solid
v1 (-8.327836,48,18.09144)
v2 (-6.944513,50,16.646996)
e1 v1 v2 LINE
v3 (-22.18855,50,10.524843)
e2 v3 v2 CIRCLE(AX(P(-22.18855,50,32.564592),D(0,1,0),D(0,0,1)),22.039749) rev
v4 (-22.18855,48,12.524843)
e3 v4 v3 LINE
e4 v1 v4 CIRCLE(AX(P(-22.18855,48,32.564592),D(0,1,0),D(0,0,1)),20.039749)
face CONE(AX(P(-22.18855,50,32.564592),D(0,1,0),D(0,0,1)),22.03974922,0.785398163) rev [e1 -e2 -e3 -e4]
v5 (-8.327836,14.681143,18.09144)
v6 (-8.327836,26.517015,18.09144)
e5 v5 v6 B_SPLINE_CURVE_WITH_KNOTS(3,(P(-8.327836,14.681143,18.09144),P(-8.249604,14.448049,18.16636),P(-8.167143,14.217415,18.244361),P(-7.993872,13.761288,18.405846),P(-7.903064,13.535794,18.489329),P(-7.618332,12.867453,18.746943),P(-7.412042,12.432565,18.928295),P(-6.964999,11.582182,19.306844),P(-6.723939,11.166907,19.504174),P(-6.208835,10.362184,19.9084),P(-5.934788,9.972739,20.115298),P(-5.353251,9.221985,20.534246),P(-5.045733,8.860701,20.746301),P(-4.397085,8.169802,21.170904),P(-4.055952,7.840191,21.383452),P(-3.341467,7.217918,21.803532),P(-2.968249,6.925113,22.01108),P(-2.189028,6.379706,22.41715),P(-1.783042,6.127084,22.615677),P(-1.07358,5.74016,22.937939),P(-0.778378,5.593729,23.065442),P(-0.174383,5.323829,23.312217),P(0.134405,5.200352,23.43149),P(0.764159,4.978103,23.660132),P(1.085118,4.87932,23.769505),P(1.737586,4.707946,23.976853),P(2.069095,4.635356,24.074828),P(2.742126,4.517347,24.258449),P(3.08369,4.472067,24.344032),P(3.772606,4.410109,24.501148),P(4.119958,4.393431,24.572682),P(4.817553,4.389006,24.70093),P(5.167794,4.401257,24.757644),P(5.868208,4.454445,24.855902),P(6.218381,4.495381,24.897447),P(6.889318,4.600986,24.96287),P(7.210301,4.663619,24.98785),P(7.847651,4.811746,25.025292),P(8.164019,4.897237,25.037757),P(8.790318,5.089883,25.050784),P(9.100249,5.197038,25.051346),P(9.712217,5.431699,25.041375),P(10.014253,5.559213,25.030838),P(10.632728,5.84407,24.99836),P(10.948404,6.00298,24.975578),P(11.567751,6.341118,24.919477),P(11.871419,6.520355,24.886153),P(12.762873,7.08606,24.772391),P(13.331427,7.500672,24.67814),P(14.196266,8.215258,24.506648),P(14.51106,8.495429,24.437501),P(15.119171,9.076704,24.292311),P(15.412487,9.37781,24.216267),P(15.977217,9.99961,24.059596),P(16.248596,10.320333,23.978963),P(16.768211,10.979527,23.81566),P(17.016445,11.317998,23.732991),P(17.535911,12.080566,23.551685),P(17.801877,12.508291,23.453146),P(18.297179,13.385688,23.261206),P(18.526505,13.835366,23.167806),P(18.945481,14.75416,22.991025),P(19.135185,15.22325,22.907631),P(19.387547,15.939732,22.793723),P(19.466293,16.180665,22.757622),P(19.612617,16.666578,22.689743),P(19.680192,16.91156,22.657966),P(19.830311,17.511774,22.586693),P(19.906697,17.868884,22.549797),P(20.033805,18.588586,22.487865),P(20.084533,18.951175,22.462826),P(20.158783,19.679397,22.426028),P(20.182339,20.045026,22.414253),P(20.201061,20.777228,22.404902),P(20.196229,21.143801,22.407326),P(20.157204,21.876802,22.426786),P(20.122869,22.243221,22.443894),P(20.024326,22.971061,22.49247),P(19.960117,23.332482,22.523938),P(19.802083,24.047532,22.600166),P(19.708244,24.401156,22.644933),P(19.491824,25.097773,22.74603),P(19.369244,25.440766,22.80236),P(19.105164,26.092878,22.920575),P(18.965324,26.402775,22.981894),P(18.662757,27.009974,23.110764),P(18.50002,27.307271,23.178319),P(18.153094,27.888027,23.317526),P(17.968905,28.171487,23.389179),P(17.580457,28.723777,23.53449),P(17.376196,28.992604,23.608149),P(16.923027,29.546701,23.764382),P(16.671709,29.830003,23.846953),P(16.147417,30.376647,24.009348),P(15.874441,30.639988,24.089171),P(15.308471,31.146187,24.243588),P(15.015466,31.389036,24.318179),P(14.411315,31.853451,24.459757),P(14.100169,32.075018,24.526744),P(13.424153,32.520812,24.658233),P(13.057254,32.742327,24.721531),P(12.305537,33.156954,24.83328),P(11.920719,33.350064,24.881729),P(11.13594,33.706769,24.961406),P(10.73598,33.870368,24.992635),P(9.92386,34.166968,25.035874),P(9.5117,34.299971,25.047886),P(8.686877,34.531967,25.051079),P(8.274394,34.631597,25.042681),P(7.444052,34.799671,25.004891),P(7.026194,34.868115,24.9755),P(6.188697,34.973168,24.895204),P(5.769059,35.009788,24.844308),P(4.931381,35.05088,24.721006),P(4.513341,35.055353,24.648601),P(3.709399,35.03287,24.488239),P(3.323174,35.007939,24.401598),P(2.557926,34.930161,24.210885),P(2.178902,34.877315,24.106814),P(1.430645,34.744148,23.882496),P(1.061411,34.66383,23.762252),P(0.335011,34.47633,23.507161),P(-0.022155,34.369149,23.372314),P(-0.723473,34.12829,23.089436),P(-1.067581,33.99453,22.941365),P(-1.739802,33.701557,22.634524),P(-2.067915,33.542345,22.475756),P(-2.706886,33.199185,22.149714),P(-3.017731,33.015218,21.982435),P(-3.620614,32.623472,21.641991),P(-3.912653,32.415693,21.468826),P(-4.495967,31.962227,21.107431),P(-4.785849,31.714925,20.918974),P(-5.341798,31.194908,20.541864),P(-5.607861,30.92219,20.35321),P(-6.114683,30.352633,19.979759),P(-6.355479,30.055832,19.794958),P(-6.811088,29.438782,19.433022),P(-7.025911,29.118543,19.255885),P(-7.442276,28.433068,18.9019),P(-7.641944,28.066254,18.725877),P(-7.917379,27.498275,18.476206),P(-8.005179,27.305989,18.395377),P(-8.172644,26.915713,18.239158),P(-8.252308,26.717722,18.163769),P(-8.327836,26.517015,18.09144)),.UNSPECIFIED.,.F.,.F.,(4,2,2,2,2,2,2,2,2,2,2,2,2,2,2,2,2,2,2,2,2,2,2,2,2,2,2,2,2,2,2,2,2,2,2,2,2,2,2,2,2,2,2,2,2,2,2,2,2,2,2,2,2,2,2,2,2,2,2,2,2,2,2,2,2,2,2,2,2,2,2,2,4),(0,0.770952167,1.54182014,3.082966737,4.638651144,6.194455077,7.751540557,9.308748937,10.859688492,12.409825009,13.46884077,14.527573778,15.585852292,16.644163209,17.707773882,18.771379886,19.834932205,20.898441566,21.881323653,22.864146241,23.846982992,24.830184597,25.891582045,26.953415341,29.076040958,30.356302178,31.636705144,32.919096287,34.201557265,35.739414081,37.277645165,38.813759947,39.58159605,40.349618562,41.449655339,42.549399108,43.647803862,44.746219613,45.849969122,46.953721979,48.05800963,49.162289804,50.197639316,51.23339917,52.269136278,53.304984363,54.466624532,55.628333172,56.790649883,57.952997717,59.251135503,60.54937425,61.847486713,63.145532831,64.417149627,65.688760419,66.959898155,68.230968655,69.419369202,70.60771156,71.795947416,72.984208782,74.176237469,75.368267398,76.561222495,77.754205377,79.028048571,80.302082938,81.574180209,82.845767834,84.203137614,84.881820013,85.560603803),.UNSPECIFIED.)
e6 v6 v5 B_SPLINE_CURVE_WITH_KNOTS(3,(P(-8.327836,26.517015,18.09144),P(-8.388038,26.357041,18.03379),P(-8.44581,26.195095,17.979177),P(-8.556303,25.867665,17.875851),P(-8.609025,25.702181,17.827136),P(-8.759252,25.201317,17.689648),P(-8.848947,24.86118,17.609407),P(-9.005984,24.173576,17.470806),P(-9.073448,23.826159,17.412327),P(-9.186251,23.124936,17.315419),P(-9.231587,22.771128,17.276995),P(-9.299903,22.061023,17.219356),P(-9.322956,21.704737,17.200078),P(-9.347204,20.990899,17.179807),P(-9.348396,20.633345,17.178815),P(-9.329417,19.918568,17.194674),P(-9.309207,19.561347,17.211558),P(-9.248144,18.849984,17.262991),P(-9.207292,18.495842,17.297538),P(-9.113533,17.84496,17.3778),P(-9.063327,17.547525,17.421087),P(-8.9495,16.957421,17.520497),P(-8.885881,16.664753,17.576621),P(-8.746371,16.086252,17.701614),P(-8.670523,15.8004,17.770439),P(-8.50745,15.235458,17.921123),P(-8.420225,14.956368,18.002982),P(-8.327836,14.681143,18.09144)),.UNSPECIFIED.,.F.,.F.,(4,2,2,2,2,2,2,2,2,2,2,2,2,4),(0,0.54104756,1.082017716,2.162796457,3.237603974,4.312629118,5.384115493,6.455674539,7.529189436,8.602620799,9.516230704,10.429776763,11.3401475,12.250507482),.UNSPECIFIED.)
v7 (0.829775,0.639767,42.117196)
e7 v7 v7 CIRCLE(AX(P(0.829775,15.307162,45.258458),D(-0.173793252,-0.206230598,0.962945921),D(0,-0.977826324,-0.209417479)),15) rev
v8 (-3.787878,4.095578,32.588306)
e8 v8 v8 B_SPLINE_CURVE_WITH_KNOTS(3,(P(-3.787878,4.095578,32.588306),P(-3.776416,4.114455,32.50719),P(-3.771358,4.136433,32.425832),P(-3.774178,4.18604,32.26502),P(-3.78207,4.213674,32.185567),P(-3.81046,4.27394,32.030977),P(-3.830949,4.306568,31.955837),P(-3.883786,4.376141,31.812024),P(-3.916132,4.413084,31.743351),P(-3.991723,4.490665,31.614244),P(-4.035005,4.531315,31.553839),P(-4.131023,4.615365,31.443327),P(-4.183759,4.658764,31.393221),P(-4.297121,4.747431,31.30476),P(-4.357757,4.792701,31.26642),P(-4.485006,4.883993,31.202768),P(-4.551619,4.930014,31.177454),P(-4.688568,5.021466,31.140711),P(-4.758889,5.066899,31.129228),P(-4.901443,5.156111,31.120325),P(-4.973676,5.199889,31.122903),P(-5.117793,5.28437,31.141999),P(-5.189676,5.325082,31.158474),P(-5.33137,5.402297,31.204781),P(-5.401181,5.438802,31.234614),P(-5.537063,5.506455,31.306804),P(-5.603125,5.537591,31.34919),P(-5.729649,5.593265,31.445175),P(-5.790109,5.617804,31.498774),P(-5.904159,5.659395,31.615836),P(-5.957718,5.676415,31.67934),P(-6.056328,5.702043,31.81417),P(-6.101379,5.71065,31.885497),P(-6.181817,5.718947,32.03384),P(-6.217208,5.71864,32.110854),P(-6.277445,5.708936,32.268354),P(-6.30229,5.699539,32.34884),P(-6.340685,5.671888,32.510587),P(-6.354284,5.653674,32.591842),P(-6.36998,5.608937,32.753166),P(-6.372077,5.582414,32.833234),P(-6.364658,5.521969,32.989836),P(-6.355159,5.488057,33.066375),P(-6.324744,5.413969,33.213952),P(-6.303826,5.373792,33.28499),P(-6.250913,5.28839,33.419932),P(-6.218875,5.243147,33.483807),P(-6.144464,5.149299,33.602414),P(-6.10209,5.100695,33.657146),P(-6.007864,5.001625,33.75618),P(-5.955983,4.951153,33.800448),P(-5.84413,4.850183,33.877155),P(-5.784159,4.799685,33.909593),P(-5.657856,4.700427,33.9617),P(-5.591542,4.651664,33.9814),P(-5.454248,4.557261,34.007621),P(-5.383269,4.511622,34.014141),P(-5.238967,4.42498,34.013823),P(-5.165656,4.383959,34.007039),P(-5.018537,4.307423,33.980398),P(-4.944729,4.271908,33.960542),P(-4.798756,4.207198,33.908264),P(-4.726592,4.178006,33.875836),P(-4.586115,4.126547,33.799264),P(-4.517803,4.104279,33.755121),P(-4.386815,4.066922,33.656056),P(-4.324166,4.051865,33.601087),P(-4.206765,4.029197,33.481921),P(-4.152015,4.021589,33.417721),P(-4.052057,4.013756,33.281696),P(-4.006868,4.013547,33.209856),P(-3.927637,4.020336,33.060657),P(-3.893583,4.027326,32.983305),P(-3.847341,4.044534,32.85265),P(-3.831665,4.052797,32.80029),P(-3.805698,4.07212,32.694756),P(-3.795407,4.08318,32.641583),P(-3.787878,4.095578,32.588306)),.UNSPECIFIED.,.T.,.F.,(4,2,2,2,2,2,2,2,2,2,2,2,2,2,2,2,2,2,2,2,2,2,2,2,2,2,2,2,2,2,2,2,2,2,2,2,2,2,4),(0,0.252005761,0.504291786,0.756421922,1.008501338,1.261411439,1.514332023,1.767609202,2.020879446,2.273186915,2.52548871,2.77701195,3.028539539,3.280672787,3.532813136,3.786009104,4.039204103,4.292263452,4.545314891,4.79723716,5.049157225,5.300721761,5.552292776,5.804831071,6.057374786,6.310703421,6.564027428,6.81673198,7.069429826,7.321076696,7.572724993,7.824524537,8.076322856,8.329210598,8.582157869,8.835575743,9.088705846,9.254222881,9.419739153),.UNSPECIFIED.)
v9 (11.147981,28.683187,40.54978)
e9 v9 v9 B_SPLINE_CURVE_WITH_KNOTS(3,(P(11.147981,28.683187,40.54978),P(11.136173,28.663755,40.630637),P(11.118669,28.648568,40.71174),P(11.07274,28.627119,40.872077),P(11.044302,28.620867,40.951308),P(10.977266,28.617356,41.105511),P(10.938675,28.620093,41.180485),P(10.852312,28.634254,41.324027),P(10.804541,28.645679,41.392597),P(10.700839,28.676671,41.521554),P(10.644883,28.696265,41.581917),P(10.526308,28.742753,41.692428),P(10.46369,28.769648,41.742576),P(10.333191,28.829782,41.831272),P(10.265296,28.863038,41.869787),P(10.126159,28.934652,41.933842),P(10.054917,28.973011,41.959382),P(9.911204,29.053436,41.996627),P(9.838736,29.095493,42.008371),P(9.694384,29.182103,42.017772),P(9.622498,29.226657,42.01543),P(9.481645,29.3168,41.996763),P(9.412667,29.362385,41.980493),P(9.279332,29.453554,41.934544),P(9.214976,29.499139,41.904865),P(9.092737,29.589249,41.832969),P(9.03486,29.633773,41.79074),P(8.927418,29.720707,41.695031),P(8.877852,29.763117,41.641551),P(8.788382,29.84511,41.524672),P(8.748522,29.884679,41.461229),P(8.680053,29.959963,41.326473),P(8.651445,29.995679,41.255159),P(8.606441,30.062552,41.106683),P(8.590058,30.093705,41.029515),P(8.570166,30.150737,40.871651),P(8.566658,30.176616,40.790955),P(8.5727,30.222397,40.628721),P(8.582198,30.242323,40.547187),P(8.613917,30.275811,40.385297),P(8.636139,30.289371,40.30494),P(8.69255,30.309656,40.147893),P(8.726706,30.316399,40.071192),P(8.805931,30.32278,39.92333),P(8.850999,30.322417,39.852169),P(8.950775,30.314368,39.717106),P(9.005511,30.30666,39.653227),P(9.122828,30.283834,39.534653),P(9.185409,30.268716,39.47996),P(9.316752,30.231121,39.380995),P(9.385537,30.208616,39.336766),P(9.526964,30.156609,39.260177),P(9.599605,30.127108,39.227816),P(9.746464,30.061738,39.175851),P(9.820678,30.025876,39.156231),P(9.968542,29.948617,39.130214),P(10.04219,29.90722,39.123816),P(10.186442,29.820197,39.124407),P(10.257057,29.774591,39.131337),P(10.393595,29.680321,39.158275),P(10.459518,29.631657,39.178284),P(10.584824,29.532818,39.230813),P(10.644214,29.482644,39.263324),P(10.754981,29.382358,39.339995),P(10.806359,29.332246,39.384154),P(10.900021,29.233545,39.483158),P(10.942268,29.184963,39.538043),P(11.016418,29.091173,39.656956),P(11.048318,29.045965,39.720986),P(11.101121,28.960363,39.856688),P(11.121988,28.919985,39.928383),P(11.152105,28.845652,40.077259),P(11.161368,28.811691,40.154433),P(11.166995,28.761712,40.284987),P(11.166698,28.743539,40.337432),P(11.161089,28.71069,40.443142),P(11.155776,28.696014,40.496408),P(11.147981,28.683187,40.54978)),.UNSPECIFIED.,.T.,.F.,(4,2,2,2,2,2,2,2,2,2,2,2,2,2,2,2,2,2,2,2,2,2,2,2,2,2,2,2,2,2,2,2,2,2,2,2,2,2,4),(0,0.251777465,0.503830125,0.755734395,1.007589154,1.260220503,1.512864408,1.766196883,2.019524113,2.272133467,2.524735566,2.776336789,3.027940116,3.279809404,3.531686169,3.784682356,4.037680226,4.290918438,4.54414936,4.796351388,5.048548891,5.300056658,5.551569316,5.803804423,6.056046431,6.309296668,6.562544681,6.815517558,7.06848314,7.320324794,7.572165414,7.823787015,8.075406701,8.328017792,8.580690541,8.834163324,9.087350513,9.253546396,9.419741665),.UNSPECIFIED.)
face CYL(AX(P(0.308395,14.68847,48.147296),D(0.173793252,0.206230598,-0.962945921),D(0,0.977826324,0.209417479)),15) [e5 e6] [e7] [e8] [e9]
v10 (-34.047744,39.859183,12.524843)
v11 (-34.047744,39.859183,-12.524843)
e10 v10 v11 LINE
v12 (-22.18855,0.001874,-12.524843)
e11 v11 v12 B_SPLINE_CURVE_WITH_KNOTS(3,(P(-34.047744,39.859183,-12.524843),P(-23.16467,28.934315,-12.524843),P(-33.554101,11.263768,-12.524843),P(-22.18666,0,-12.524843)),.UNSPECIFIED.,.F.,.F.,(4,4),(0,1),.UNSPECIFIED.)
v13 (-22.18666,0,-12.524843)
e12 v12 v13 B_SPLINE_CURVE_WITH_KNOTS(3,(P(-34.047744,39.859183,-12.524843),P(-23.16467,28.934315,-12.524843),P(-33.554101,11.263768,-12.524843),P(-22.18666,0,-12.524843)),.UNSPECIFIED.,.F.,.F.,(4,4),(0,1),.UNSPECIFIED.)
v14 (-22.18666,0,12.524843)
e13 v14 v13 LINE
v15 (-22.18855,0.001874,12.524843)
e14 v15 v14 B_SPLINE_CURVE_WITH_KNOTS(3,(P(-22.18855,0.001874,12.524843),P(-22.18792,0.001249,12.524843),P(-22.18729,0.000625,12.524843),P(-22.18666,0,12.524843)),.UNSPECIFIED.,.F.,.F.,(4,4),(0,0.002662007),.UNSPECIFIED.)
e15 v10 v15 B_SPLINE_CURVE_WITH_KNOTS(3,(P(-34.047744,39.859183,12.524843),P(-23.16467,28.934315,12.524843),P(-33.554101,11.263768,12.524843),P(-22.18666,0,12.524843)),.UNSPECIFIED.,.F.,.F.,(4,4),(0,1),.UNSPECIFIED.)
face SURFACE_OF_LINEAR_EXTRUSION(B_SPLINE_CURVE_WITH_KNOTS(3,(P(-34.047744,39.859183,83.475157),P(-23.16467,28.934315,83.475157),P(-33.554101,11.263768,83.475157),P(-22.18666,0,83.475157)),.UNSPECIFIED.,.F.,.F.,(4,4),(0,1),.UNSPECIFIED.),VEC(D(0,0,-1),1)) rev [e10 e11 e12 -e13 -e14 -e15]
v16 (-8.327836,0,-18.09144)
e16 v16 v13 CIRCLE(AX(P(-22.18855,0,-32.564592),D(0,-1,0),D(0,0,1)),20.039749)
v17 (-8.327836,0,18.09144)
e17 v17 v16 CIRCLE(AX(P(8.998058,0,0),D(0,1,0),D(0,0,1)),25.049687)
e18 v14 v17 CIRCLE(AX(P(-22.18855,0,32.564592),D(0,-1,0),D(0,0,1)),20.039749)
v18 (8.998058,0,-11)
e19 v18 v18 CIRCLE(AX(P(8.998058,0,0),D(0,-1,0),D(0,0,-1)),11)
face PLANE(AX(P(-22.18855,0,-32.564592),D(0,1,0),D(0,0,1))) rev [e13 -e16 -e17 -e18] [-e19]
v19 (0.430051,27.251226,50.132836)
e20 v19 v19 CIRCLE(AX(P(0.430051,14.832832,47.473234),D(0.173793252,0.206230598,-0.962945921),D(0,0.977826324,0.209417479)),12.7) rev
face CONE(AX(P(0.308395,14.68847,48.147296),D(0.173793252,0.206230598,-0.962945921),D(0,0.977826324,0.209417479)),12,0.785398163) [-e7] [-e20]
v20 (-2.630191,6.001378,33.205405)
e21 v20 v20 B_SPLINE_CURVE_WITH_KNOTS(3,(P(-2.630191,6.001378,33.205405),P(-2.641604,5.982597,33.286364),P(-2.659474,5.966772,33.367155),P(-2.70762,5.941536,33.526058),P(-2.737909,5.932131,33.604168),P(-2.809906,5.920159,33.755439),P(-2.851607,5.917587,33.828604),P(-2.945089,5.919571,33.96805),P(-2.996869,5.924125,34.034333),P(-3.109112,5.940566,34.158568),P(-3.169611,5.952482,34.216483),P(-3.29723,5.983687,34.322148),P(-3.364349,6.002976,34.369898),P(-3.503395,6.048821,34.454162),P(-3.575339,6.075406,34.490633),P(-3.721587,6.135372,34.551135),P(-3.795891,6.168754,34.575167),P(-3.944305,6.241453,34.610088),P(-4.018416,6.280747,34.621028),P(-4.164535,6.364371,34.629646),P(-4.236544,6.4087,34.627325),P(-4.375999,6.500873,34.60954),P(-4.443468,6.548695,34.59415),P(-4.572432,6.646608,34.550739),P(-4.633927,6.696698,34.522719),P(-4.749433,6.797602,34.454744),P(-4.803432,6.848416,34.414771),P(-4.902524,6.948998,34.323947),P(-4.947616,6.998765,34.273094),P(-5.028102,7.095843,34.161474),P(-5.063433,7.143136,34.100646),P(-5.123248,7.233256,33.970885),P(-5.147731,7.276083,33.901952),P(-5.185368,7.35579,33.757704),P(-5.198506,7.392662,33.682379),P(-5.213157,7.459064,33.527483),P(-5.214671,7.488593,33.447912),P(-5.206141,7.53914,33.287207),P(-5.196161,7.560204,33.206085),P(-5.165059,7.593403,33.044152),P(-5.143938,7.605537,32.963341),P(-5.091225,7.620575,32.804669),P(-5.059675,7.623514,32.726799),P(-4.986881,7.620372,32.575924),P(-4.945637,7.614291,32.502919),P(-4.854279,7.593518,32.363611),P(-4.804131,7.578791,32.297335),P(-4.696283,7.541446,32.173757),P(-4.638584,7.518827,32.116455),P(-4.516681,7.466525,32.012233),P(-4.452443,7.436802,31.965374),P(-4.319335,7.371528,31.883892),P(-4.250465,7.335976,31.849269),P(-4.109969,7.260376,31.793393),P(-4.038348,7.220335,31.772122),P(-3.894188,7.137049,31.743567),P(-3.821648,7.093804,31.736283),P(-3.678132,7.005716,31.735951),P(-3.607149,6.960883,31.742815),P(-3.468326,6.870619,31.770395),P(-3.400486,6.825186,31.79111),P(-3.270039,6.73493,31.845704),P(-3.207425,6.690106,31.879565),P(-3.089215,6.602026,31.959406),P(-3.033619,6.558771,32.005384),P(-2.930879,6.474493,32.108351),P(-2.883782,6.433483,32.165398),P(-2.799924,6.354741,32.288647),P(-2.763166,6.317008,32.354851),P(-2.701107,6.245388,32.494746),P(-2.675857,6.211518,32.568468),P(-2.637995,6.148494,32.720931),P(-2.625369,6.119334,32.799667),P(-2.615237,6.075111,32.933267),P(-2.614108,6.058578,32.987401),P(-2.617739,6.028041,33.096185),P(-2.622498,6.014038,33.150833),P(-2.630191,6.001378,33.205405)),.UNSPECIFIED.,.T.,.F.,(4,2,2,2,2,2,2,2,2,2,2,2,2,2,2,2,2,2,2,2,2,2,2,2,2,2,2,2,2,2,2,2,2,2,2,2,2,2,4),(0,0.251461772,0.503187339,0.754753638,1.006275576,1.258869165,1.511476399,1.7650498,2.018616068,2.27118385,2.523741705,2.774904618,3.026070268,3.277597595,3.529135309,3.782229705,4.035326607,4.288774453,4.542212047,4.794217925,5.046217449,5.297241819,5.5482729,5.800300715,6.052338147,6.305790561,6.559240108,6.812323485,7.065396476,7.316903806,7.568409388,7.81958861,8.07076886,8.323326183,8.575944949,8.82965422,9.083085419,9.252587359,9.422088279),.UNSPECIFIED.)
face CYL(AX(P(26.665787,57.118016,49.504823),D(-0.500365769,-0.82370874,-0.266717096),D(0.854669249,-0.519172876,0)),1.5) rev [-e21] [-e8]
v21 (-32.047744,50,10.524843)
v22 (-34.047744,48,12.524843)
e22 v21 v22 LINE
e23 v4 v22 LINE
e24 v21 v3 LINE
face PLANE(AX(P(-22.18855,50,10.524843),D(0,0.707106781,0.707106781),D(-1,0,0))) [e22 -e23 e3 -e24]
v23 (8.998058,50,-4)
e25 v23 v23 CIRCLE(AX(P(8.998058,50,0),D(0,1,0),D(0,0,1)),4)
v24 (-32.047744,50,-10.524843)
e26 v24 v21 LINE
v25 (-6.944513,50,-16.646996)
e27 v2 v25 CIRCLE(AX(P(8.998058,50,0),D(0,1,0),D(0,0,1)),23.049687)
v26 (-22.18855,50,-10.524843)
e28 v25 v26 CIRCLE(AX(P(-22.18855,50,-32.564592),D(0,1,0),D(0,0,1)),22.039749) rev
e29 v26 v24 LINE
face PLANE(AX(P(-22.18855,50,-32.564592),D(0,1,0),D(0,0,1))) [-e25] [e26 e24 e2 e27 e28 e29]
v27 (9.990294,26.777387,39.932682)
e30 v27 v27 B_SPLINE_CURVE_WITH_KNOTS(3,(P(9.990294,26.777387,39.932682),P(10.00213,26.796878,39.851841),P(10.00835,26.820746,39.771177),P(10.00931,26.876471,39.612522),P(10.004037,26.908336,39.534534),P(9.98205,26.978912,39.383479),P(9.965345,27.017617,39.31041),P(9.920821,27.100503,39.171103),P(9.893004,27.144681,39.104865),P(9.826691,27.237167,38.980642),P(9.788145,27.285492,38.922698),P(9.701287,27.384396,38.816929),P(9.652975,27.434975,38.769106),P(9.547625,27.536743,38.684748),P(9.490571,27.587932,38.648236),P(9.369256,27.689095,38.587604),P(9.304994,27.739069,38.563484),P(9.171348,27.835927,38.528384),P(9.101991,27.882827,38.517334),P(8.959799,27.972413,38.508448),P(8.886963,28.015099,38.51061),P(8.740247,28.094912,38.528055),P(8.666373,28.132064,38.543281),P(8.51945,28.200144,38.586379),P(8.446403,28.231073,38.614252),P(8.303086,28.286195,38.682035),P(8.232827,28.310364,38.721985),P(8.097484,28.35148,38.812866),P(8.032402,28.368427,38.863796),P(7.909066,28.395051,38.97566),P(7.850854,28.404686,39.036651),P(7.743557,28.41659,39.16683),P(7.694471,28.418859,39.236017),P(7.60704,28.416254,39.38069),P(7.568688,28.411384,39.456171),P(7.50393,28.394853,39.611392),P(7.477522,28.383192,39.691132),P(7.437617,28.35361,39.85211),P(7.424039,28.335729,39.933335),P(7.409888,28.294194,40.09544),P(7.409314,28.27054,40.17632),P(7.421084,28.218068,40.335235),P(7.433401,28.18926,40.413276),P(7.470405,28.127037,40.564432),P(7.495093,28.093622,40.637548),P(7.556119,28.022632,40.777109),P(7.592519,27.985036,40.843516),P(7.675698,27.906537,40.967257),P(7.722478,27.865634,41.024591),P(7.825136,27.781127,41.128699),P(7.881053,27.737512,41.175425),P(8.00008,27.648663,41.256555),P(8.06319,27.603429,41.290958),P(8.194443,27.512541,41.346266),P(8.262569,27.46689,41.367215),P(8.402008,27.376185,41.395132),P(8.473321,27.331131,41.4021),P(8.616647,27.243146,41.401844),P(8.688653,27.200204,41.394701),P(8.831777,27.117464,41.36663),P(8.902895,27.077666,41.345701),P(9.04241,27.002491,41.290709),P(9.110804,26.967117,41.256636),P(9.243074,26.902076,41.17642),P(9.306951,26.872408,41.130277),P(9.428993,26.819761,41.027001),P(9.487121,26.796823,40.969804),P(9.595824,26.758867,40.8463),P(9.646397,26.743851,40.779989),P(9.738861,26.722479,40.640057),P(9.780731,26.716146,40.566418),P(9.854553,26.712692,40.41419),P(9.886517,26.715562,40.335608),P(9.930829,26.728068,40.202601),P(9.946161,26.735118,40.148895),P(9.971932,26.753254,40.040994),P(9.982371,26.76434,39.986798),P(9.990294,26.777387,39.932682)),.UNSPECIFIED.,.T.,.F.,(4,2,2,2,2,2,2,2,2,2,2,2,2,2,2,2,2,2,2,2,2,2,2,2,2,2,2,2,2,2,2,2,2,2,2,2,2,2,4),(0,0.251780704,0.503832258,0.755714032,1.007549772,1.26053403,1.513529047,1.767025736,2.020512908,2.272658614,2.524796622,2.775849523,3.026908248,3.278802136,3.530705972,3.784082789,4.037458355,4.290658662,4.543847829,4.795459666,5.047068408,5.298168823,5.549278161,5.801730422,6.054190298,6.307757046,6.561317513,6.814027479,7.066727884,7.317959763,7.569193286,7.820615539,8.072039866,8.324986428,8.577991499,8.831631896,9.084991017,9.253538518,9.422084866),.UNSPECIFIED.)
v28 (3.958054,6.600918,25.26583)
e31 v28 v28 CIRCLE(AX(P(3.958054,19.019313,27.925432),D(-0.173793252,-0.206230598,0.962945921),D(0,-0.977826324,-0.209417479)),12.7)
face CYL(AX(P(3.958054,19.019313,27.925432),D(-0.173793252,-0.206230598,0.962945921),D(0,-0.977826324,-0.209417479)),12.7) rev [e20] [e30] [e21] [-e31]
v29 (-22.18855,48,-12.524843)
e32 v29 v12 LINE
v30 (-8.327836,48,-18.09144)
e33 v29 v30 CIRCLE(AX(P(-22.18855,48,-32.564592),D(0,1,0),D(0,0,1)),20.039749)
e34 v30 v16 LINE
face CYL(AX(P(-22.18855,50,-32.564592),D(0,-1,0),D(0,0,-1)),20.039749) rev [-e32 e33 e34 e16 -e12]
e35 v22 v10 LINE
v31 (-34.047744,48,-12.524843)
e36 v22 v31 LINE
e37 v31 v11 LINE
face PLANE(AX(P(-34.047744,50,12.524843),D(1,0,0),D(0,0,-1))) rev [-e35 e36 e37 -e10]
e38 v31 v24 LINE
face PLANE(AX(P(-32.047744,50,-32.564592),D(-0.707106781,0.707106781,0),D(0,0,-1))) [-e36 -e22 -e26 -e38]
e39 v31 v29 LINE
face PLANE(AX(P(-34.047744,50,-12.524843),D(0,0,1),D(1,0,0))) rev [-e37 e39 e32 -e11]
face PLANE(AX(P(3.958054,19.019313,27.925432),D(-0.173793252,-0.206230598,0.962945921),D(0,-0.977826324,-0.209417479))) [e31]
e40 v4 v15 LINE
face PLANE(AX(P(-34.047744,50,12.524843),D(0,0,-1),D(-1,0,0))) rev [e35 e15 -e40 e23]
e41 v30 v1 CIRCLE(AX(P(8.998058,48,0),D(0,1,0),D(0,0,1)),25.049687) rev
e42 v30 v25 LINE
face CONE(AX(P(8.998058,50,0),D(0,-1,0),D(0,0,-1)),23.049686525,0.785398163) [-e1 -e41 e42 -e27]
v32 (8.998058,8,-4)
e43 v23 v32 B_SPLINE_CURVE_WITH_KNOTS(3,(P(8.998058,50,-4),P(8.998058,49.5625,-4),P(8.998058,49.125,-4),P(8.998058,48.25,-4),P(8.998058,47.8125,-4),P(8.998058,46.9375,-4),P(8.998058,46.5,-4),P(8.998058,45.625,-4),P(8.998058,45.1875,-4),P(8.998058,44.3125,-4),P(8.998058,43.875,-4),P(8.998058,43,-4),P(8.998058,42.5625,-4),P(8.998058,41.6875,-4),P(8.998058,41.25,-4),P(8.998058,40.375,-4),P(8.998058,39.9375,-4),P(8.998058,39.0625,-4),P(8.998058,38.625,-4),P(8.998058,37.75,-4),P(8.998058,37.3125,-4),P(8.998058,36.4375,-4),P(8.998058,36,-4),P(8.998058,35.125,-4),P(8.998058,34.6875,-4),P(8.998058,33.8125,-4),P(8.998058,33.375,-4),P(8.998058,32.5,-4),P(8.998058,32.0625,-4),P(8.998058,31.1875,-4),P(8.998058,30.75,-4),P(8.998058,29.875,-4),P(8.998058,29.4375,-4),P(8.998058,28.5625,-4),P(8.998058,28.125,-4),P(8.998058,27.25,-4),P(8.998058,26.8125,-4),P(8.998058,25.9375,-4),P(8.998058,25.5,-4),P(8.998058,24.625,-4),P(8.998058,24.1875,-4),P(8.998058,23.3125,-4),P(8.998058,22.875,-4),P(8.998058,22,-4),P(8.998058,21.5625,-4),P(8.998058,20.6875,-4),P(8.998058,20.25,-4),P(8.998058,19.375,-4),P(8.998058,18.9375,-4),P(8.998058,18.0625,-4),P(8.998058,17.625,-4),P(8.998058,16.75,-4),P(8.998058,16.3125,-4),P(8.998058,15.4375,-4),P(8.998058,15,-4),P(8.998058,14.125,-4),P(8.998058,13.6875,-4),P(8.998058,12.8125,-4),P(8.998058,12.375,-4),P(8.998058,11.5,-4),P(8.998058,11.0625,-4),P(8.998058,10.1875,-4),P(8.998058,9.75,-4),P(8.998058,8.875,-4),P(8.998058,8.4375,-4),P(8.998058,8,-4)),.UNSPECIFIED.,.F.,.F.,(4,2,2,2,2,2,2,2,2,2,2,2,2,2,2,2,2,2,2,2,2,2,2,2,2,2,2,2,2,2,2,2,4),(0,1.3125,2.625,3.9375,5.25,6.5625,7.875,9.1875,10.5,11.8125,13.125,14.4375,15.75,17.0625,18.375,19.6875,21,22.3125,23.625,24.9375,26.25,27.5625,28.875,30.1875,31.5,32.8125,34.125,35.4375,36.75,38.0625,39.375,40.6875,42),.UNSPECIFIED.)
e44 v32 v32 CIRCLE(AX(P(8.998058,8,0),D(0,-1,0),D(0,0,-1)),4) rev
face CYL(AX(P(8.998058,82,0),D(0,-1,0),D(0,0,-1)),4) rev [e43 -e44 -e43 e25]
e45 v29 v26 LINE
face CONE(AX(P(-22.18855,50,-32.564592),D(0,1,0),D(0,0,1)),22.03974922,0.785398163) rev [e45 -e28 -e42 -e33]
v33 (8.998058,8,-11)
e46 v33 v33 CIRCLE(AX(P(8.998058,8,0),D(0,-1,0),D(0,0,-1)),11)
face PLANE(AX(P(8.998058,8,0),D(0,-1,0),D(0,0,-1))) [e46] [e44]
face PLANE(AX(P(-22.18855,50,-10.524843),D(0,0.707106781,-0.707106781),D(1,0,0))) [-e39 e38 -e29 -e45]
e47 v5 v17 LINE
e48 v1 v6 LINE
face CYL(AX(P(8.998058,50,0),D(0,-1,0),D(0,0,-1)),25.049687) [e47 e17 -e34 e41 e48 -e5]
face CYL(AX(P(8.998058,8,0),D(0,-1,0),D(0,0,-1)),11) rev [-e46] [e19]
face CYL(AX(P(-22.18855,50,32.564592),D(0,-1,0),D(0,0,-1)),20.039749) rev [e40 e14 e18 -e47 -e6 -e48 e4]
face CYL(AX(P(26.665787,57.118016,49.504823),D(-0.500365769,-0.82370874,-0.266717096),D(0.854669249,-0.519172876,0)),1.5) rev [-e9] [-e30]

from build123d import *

# Parameters (mm, degrees)
BOSS_EXTRUDE2_DEPTH = 50
CHAMFER1_SIZE       = 2
SKETCH3_R           = 15
BOSS_EXTRUDE3_DEPTH = 50
SKETCH5_R           = 12.7
CUT_EXTRUDE1_DEPTH  = 21
CHAMFER2_SIZE       = 3
SKETCH6_R           = 1.5
CUT_EXTRUDE2_DEPTH  = 48.5
SKETCH7_R           = 4
CUT_EXTRUDE3_DEPTH  = 82
SKETCH9_R           = 11
CUT_EXTRUDE4_DEPTH  = 8
CHAMFER3_SIZE       = 2
CUT_EXTRUDE5_DEPTH  = 96


with BuildPart() as part:
    # Sketch1 → Boss-Extrude2 (new body)
    with BuildSketch(Plane(origin=(0, 0, 0), x_dir=(1, 0, 0), z_dir=(0, 1, 0))):
        with BuildLine():
            Line((-34.047744375, -12.524843262), (-22.18855037, -12.524843262))
            ThreePointArc((-22.18855037, -12.524843262), (-14.720176785, -13.968492225), (-8.327835606, -18.091440268))
            ThreePointArc((-8.327835606, -18.091440268), (34.047744375, 0), (-8.327835606, 18.091440268))
            ThreePointArc((-8.327835606, 18.091440268), (-14.720176785, 13.968492225), (-22.18855037, 12.524843262))
            Line((-22.18855037, 12.524843262), (-34.047744375, 12.524843262))
            Line((-34.047744375, 12.524843262), (-34.047744375, -12.524843262))
        make_face()
    extrude(amount=BOSS_EXTRUDE2_DEPTH)

    # Chamfer1
    chamfer1_edges = [part.edges().sort_by_distance(p)[0] for p in [
        (-14.720176785, 50, 13.968492225),
        (34.047744375, 50, 0),
        (-14.720176785, 50, -13.968492225),
        (-28.118147372, 50, -12.524843262),
        (-28.118147372, 50, 12.524843262),
    ]]
    chamfer(chamfer1_edges, length=CHAMFER1_SIZE)

    # Sketch3 → Boss-Extrude3 (add)
    with BuildSketch(Plane(origin=(8.99805785, 25, 0), x_dir=(0.9847817818042102, -0.03725406297903357, 0.1697556391348433), z_dir=(-0.17379325152773012, -0.2062305980482824, 0.9629459206788651))):
        with Locations(Location((0, 0, 0), (0, 0, 159.473102118))):
            Circle(SKETCH3_R)
    extrude(amount=BOSS_EXTRUDE3_DEPTH)

    # Sketch5 → Cut-Extrude1 (cut)
    with BuildSketch(Plane(origin=(-7.521847234, -8.925749647, 41.676716708), x_dir=(0.9847817818042102, -0.03725406297903372, 0.16975563913484326), z_dir=(-0.17379325152773012, -0.2062305980482824, 0.9629459206788651))):
        with Locations(Location((7.929771868, 24.45263149, 0), (0, 0, 270.050317468))):
            Circle(SKETCH5_R)
    extrude(amount=-CUT_EXTRUDE1_DEPTH, mode=Mode.SUBTRACT)

    # Chamfer2
    # the kernel refuses this chamfer: 3 mm, written as the material it takes off along each edge
    with BuildSketch(Plane(origin=(0.308395273, 14.688470098, 48.147296034), x_dir=(-0.9219524467114961, 0.37774931122051036, -0.08549353118871512), z_dir=(0.3461207762127333, 0.9026485463906081, 0.255785085516762))) as chamfer2_piece_1:
        Polygon((15, -CHAMFER2_SIZE), (15 - CHAMFER2_SIZE, 0), (15, 0), align=None)
    revolve(axis=Axis((0.308395273, 14.688470098, 48.147296034), (-0.17379325152773012, -0.20623059804828237, 0.9629459206788651)), mode=Mode.SUBTRACT)

    # Sketch6 → Cut-Extrude2 (cut, symmetric)
    with BuildSketch(Plane(origin=(-22.18855037, 48, -12.524843262), x_dir=(-0.8657900557986787, 0.47372232177796453, 0.16122884707587404), z_dir=(-0.500365768548969, -0.82370873989167, -0.26671709635956337))):
        with Locations(Location((-27.977220625, -56.414440492, 0), (0, 0, 189.630227826))):
            Circle(SKETCH6_R)
    extrude(amount=CUT_EXTRUDE2_DEPTH, both=True, mode=Mode.SUBTRACT)

    # Sketch7 → Cut-Extrude3 (cut)
    with BuildSketch(Plane(origin=(0, 0, 0), x_dir=(-1, 0, 0), z_dir=(0, -1, 0))):
        with Locations(Location((-8.99805785, 0, 0), (0, 0, 90))):
            Circle(SKETCH7_R)
    extrude(amount=-CUT_EXTRUDE3_DEPTH, mode=Mode.SUBTRACT)

    # Sketch9 → Cut-Extrude4 (cut)
    with BuildSketch(Plane.XZ):
        with Locations(Location((8.99805785, 0, 0), (0, 0, 270))):
            Circle(SKETCH9_R)
    extrude(amount=-CUT_EXTRUDE4_DEPTH, mode=Mode.SUBTRACT)

    # Chamfer3
    chamfer3_edges = [part.edges().sort_by_distance(p)[0] for p in [
        (-34.047744375, 50, 0),
    ]]
    chamfer(chamfer3_edges, length=CHAMFER3_SIZE)

    # Sketch10 → Cut-Extrude5 (cut)
    with BuildSketch(Plane(origin=(0, 0, -12.524843262), x_dir=(-1, 0, 0), z_dir=(0, 0, -1))):
        with BuildLine():
            Line((22.186659572, 0), (34.047744375, 0))
            Line((34.047744375, 0), (34.047744375, 39.859182783))
            add(Edge.make_bspline(
                [(22.186659572, 0), (33.554101307, 11.263767606), (23.164669735, 28.934314706), (34.047744375, 39.859182783)],
                knots=[0, 0, 0, 0, 1, 1, 1, 1], degree=3))
        make_face()
    extrude(amount=-CUT_EXTRUDE5_DEPTH, mode=Mode.SUBTRACT)


solid = part.part
